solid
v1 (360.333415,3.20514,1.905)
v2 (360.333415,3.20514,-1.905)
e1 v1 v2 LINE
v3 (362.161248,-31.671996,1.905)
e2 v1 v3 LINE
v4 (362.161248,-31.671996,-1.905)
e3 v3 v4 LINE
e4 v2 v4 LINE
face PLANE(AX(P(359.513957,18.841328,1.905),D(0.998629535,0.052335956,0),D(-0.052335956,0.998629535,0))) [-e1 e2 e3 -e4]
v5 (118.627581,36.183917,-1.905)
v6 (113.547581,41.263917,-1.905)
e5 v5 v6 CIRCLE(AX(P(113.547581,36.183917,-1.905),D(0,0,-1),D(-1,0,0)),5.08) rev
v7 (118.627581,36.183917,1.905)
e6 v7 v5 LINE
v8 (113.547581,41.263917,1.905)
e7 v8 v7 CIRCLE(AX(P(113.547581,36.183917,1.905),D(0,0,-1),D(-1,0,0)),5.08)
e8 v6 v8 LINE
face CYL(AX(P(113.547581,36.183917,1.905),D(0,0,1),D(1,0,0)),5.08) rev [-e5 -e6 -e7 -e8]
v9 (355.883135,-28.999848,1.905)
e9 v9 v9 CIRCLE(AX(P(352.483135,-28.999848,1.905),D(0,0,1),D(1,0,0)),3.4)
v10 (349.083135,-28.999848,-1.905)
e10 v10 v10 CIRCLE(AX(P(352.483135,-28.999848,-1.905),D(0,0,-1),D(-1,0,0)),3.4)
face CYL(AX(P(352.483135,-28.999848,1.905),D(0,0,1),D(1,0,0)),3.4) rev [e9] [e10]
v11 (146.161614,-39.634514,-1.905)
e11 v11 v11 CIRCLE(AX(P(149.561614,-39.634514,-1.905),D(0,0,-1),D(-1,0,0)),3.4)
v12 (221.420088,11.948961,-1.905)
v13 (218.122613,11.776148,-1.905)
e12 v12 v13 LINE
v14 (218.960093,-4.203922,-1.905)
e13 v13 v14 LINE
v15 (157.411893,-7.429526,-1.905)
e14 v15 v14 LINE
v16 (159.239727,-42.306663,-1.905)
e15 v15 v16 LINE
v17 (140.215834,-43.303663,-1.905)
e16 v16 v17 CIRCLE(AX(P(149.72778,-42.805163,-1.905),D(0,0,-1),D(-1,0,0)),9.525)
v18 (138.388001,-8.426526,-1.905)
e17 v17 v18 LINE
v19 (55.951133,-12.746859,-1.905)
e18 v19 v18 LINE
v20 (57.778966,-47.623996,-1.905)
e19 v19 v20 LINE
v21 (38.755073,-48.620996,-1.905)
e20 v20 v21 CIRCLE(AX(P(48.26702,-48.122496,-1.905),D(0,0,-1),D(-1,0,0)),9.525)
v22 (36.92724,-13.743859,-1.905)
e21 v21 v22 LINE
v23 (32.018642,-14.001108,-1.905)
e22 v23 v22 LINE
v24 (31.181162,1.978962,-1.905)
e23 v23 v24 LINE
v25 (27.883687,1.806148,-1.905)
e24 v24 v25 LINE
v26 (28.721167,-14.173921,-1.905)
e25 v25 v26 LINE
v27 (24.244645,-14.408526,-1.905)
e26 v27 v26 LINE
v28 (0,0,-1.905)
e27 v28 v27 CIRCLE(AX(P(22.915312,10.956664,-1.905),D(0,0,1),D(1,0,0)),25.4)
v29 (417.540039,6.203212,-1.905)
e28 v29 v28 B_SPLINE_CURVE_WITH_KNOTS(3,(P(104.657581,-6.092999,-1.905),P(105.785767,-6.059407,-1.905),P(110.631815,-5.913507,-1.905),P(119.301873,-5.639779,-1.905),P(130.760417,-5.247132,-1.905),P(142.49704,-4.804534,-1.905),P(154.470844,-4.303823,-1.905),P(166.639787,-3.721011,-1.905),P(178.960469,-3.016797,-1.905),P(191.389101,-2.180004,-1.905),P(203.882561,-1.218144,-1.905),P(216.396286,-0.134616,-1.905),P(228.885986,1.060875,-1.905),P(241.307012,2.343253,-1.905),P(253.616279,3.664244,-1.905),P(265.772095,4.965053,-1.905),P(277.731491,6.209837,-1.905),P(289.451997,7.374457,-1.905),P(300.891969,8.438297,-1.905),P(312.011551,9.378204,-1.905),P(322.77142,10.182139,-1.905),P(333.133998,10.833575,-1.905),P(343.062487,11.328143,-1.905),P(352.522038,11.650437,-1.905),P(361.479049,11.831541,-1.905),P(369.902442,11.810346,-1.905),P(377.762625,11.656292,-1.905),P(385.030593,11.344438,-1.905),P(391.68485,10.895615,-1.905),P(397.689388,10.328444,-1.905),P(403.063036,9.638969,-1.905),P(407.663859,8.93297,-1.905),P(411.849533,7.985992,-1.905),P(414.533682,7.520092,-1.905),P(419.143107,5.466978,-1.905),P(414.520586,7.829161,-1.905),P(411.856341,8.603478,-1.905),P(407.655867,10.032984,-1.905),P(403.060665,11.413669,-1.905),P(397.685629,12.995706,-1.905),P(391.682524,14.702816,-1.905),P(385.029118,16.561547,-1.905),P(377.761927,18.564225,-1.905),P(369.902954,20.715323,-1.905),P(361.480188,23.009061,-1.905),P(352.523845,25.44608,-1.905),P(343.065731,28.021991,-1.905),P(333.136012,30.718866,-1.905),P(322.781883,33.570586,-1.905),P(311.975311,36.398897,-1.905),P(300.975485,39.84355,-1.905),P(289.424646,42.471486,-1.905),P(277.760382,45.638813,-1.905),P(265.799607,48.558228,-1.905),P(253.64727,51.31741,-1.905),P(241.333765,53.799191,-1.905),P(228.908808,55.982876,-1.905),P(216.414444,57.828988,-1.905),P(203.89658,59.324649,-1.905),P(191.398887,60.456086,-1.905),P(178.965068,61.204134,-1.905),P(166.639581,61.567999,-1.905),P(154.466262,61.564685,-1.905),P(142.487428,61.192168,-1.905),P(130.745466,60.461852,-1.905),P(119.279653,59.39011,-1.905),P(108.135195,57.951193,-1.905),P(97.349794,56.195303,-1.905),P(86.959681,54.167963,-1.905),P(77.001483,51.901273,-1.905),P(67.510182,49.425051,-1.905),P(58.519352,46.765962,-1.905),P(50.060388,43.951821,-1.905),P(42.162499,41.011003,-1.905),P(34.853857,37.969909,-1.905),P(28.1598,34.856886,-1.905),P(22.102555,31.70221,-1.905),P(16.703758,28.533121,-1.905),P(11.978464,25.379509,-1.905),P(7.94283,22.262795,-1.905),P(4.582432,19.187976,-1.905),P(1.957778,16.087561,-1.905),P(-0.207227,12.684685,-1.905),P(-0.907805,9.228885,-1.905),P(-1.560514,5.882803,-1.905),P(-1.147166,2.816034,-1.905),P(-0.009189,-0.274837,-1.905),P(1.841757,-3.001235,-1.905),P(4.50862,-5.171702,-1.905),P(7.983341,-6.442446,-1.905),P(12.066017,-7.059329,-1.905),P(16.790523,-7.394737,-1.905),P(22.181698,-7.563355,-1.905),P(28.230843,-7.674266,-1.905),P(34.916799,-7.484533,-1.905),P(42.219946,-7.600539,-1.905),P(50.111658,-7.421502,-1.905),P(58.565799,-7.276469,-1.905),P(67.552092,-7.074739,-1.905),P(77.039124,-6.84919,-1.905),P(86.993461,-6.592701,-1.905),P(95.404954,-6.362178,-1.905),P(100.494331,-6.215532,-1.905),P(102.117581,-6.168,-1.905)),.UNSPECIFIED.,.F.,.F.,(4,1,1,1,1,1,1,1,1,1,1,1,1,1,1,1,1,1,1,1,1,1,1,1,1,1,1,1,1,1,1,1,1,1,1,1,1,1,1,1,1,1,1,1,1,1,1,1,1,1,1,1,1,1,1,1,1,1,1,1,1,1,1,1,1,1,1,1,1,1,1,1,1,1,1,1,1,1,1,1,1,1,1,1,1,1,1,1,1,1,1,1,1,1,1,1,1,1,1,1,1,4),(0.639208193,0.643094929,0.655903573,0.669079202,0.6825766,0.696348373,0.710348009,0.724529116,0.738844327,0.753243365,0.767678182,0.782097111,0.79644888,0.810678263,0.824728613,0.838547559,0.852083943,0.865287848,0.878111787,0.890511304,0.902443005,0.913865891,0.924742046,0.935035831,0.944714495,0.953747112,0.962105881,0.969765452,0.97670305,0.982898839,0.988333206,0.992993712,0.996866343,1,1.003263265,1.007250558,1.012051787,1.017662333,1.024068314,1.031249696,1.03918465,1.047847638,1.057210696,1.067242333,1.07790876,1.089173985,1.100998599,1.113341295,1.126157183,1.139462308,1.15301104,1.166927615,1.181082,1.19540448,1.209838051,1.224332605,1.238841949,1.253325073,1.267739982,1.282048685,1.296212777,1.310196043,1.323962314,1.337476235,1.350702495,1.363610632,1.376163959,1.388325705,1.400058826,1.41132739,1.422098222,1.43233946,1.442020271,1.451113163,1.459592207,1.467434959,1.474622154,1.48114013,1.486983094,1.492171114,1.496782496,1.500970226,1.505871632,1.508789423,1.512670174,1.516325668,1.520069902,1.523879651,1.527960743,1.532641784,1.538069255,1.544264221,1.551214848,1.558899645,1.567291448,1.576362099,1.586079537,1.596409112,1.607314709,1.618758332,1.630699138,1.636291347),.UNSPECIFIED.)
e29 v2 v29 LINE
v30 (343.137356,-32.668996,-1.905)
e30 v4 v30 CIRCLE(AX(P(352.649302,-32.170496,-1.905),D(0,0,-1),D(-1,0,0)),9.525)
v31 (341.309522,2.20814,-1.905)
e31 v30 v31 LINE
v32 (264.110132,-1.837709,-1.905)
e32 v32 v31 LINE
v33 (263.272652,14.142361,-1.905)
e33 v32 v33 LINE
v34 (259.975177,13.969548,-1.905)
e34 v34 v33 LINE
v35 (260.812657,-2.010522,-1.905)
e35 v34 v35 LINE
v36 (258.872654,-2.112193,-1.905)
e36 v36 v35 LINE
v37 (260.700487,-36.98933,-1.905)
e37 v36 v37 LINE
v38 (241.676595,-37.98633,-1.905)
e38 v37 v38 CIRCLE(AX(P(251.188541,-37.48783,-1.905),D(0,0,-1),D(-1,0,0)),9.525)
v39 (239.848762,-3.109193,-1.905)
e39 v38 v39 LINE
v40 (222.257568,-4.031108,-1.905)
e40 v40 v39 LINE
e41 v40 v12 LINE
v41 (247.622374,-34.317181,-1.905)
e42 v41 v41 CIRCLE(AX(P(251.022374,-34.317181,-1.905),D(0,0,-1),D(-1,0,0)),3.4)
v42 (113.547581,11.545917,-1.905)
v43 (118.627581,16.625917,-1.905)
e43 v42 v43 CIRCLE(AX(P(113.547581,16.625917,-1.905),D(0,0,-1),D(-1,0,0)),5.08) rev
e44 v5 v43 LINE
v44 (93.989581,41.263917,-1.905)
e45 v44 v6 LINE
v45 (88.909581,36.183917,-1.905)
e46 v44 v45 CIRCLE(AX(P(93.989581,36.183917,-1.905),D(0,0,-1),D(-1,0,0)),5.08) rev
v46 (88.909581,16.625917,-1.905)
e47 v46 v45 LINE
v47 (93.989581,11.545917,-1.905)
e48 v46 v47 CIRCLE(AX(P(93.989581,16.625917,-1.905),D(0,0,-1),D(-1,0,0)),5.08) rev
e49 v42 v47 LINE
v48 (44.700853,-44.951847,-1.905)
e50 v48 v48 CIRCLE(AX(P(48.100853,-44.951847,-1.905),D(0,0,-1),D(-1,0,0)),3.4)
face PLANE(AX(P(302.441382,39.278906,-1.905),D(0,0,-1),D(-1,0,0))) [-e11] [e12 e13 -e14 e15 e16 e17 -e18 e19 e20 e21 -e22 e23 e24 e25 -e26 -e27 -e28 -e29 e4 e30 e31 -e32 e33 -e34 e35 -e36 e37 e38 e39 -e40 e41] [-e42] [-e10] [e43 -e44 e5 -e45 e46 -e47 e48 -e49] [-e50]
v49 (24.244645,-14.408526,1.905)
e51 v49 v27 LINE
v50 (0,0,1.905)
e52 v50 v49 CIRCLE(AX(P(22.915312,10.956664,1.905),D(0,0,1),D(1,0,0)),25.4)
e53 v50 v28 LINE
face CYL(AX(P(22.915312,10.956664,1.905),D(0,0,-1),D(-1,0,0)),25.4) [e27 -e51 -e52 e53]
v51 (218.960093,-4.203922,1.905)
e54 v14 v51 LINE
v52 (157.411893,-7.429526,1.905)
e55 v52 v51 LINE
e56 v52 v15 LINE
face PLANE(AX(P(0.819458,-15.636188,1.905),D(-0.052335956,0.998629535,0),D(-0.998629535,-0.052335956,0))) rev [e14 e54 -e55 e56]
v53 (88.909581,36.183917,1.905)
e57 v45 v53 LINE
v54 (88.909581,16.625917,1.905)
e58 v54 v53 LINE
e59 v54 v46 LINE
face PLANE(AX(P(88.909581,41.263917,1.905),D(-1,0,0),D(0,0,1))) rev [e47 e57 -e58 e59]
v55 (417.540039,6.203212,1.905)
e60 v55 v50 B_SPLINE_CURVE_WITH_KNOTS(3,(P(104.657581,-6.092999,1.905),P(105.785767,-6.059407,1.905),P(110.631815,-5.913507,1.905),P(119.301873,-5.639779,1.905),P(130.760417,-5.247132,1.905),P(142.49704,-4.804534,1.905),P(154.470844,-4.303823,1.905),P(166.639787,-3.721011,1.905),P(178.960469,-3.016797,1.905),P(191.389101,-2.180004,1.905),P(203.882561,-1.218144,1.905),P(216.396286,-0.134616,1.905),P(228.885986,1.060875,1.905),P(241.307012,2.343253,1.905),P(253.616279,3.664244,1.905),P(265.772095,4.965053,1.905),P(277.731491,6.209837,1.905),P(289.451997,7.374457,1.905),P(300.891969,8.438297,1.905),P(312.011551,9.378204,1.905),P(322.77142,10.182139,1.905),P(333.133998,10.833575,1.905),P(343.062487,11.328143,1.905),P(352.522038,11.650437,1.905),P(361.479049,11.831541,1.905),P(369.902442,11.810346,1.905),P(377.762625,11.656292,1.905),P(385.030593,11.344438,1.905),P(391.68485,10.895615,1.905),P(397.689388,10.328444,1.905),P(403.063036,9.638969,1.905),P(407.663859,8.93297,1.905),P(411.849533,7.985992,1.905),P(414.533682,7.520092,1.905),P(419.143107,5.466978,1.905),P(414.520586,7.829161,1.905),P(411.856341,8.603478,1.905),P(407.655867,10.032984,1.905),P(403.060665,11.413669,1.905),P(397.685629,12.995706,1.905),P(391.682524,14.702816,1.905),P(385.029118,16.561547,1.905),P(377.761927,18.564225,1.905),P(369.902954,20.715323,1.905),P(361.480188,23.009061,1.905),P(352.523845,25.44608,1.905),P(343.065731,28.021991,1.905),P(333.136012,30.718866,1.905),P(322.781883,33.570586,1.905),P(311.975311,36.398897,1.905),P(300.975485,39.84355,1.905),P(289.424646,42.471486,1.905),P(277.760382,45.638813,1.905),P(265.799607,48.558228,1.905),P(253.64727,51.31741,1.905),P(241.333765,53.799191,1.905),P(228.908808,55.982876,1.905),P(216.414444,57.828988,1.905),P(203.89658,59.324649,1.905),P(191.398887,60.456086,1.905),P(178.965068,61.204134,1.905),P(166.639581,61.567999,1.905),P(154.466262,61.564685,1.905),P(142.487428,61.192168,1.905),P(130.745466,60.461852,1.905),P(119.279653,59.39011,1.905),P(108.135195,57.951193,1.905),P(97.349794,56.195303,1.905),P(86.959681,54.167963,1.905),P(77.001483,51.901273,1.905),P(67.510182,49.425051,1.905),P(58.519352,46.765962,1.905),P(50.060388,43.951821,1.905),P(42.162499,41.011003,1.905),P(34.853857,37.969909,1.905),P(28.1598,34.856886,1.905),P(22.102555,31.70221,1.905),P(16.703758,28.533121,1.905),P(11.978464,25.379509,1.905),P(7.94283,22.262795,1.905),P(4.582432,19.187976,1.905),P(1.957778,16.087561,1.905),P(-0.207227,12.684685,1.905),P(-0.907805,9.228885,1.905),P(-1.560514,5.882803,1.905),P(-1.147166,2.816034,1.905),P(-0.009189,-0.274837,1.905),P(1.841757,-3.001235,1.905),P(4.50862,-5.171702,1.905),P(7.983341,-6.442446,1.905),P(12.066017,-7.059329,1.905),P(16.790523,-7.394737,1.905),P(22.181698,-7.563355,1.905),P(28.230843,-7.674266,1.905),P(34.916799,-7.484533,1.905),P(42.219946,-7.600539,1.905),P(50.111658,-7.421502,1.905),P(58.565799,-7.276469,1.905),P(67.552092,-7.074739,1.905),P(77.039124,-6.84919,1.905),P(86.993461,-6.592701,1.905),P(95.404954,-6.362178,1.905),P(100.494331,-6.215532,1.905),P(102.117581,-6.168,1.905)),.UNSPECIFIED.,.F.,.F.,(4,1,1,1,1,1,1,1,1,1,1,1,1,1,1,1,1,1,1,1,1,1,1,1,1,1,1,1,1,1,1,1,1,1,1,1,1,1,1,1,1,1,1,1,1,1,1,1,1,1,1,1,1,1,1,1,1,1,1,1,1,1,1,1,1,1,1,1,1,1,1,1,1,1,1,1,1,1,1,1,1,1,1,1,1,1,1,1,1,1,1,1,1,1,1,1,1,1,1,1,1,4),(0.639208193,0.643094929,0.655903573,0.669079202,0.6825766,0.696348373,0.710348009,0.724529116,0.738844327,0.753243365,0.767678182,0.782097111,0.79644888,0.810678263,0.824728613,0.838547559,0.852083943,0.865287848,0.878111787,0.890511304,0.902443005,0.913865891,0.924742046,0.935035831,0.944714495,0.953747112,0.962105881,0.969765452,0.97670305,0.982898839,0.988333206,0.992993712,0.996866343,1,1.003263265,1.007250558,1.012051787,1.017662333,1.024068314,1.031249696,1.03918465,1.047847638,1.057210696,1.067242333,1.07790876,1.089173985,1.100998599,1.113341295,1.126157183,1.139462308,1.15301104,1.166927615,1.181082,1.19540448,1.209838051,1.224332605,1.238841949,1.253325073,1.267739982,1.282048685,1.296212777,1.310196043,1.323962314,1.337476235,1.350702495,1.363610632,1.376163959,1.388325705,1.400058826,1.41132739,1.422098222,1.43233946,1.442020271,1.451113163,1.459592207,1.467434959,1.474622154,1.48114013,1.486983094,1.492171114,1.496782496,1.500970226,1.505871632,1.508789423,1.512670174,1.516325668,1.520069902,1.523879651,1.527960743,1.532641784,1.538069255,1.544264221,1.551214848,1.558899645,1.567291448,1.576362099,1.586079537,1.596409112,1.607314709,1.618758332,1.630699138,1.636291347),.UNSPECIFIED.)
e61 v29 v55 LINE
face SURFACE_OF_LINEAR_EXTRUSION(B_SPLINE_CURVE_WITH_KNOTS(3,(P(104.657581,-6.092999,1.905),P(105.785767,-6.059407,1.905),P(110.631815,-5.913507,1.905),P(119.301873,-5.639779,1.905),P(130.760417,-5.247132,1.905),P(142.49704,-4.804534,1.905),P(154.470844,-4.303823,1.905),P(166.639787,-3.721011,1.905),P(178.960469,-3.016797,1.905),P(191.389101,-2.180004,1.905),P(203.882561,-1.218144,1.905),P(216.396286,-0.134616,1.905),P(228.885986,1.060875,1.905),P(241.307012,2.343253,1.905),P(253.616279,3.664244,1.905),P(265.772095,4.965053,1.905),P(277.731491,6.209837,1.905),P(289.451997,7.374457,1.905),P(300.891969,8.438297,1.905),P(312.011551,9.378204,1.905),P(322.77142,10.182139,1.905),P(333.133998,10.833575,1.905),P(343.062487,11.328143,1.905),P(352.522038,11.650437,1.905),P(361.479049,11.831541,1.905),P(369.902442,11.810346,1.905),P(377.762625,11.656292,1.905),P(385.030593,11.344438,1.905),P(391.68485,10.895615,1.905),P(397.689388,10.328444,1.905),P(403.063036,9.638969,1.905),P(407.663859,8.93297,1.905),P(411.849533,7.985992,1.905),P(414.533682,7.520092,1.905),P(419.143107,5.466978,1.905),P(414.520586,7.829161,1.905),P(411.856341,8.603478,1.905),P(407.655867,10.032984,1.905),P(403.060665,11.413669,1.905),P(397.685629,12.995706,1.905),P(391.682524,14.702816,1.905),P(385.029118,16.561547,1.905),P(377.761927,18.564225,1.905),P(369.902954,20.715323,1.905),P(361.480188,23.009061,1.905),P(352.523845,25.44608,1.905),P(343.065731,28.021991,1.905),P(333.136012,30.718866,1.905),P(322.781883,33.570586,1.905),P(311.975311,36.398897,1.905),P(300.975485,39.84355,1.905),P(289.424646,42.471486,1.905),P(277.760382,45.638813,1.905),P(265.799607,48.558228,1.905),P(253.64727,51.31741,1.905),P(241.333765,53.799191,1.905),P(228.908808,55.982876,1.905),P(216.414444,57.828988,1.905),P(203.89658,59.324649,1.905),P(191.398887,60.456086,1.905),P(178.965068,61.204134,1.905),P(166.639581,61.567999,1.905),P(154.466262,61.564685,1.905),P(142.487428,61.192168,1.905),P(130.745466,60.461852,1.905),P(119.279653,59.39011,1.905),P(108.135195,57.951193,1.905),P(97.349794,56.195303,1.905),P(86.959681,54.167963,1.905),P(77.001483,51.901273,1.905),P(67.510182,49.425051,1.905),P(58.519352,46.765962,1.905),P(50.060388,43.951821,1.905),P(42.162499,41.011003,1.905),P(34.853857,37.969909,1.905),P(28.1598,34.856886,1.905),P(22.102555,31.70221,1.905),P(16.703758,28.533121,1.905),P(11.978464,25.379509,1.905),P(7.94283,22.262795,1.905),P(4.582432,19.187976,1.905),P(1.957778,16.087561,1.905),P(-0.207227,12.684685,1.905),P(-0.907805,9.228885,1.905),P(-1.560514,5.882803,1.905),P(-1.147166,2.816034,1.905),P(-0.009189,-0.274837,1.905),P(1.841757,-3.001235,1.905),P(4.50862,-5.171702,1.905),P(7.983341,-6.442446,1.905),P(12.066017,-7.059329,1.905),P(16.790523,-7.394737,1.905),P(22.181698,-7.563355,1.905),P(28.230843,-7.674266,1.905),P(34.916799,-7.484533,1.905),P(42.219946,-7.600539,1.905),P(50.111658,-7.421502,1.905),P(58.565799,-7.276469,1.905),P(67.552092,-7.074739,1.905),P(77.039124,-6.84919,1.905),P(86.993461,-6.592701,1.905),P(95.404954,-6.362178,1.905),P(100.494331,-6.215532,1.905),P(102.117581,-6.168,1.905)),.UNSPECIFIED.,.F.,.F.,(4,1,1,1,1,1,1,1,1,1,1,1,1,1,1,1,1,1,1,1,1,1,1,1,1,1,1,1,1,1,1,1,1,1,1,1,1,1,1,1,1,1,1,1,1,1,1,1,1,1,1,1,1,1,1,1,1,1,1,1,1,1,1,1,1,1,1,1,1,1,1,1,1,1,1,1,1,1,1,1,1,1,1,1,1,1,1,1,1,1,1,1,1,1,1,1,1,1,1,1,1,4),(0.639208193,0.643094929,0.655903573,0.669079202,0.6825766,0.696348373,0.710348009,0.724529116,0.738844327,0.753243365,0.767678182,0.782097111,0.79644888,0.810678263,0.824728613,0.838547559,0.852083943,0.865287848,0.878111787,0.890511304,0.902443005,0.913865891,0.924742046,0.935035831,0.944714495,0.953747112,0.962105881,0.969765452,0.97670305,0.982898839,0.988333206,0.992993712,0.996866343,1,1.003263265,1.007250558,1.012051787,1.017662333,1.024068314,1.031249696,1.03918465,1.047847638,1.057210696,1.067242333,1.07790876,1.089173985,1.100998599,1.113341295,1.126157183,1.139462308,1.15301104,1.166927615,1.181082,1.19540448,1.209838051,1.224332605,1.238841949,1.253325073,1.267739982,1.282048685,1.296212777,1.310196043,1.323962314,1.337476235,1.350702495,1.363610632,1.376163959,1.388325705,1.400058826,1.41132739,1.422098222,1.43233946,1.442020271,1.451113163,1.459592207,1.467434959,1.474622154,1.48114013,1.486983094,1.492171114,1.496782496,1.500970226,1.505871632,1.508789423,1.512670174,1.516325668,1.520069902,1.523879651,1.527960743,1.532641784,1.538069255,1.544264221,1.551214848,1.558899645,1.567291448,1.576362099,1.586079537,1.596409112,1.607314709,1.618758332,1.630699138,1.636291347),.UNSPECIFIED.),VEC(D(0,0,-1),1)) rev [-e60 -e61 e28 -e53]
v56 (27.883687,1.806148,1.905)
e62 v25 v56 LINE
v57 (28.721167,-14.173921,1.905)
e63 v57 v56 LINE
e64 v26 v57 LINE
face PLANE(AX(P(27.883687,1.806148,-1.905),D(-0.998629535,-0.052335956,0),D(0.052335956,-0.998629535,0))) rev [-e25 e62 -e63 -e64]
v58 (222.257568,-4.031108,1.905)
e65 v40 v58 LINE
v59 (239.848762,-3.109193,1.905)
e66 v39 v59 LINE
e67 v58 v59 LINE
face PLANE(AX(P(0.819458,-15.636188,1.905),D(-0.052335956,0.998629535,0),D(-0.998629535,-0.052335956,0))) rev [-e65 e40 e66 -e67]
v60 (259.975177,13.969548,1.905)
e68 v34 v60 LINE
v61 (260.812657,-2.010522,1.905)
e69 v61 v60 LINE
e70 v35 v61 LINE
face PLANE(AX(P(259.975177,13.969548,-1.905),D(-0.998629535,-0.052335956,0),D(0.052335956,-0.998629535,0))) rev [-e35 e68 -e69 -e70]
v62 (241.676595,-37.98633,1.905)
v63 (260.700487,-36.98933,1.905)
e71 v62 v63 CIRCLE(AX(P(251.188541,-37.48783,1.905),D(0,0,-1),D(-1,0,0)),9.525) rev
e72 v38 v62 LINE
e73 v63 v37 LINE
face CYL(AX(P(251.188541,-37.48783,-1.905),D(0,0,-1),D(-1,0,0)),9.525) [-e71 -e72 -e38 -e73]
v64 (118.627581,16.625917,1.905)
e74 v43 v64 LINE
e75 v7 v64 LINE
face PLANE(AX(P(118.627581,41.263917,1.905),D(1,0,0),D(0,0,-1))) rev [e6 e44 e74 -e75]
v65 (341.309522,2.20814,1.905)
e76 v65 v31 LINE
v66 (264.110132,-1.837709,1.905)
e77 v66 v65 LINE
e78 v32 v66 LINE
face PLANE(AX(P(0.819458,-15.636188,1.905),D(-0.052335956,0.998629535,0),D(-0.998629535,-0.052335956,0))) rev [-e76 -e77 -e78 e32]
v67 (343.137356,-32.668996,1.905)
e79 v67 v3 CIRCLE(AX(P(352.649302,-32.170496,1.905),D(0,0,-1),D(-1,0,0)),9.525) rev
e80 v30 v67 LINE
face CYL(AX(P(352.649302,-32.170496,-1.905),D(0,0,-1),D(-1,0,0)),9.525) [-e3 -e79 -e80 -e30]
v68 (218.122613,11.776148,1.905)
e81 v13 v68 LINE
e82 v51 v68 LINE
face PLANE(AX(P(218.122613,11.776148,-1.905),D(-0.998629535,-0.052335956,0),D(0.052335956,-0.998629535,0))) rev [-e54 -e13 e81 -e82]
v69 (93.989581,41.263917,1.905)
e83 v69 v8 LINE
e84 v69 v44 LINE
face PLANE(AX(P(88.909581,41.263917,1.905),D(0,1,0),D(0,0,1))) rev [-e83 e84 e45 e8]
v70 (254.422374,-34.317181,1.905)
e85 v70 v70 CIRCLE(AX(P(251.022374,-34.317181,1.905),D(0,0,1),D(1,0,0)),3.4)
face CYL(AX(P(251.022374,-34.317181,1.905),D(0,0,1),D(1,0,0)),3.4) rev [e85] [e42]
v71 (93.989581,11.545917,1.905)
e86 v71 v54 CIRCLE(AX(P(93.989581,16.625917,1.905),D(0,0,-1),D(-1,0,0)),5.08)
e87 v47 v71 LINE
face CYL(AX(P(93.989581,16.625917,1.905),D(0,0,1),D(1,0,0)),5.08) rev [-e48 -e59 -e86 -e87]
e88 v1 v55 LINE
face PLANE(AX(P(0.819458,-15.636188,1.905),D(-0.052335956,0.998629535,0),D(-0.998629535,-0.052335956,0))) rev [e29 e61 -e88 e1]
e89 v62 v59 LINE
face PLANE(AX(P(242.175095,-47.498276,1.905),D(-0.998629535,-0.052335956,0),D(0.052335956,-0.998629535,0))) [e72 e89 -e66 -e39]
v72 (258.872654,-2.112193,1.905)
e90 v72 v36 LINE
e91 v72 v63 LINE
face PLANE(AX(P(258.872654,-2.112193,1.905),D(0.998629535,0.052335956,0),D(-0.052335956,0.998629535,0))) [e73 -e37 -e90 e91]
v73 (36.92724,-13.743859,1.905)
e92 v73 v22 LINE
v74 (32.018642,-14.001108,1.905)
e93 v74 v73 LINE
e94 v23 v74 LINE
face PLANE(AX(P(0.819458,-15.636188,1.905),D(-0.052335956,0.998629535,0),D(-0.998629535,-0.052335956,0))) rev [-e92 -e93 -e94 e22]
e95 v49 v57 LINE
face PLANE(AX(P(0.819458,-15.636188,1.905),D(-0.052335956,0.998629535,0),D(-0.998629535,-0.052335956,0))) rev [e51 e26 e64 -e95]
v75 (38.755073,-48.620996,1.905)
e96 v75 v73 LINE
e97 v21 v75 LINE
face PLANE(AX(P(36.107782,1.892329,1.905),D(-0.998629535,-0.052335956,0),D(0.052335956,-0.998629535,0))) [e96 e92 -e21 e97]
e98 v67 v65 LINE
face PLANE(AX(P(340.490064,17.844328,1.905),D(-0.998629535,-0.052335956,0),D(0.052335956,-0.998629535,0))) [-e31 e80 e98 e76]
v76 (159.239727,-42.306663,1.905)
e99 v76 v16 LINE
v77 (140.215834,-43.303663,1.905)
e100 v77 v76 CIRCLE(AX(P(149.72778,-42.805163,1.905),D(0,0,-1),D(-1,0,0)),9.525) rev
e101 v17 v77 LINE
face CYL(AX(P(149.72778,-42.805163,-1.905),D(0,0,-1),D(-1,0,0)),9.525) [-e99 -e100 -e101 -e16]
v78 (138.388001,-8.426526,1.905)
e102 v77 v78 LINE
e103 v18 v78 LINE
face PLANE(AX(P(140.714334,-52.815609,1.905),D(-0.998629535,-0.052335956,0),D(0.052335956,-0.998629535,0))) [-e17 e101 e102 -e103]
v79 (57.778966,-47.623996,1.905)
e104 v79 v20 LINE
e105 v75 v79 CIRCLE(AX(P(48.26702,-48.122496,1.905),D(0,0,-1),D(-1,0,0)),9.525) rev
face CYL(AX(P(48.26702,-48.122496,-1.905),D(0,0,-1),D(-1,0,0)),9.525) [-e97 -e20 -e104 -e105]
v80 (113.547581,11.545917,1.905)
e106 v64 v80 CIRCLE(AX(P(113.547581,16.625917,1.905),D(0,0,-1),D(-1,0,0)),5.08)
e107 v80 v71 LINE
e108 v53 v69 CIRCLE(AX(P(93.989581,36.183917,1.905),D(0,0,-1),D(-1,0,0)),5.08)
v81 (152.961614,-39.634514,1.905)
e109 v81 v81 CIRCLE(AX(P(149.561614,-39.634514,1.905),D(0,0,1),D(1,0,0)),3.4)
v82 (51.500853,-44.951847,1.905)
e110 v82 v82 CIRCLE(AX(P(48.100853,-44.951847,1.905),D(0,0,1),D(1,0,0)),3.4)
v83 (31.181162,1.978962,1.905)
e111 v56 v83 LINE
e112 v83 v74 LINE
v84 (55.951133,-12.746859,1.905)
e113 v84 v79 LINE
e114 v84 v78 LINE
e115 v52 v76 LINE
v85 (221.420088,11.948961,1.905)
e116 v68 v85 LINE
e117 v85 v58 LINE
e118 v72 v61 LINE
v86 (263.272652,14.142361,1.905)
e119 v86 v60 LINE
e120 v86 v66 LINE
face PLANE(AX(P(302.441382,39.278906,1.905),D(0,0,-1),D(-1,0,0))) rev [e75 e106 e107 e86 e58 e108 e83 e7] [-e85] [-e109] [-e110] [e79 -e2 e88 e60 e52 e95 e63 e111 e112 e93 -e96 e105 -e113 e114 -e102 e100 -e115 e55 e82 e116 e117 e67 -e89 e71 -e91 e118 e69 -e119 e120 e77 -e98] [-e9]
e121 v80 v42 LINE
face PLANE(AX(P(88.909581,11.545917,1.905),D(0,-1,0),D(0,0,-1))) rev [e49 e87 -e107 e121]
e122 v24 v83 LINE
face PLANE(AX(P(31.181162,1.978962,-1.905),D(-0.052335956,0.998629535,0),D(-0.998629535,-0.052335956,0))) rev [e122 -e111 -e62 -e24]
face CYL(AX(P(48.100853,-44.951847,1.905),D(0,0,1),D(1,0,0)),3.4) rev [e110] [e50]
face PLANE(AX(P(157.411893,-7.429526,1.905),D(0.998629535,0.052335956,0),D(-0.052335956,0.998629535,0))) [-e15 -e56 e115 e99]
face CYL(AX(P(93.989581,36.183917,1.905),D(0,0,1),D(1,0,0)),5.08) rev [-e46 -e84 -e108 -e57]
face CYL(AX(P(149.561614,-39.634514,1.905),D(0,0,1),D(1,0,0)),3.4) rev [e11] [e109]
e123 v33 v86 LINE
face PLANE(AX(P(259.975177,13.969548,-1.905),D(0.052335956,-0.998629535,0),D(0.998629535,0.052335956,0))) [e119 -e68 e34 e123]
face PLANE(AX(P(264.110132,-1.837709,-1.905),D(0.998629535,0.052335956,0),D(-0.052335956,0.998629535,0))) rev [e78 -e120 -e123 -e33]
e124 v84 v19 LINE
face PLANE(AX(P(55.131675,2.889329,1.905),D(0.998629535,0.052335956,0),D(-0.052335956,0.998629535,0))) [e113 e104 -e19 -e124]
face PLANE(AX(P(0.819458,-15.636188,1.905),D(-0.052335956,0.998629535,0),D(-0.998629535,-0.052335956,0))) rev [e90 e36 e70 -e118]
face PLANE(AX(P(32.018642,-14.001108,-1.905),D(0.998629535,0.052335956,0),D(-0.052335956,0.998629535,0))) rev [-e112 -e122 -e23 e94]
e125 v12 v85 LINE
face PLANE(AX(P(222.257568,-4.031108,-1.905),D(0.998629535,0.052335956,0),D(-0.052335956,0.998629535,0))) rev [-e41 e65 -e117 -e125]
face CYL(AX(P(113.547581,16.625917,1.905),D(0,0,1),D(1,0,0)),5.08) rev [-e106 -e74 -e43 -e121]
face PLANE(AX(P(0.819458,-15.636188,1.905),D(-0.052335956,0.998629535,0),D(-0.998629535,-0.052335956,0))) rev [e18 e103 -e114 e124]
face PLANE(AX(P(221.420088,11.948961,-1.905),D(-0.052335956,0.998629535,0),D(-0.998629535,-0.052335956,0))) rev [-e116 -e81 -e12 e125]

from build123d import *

# Parameters (mm, degrees)
BOSS_EXTRUDE1_DEPTH     = 1.905
BOSS_EXTRUDE2_START     = -1.905
BOSS_EXTRUDE2_DEPTH     = 3.81
TAP_DRILL_FOR_M8_TAP1_D = 6.8
FILLET1_R               = 5.08
CUT_EXTRUDE1_DEPTH      = 423.240896091
CUT_EXTRUDE1_DEPTH_BACK = 423.240896091
FILLET3_RADIUS          = 9.525
FILLET3_LENGTH          = 3.81
FILLET4_RADIUS          = 9.525
FILLET4_LENGTH          = 3.81
FILLET5_RADIUS          = 9.525
FILLET5_LENGTH          = 3.81
FILLET6_RADIUS          = 9.525
FILLET6_LENGTH          = 3.81


# Read off the part's stored shape, not the designer's step: Boss-Extrude2
with BuildPart() as part:
    # Sketch1 → Boss-Extrude1 (new, symmetric)
    with BuildSketch(Plane.XY):
        with BuildLine():
            Line((88.909580783, 41.26391721), (118.627580783, 41.26391721))
            Line((118.627580783, 41.26391721), (118.627580783, 11.54591721))
            Line((118.627580783, 11.54591721), (104.657580783, 11.54591721))
            Line((104.657580783, 11.54591721), (104.657580783, -6.092999308))
            add(Edge.make_bspline(
                [(104.657580783, -6.092999308), (105.78576696, -6.059407355), (110.631815253, -5.913506799), (119.301873398, -5.639779221), (130.760417354, -5.247131629), (142.497040297, -4.804534274), (154.470843852, -4.303823254), (166.639786874, -3.721010638), (178.960468691, -3.016797235), (191.389100737, -2.180004159), (203.882560612, -1.218144366), (216.39628583, -0.134616133), (228.885986304, 1.060875443), (241.307012185, 2.343253014), (253.616279039, 3.664244089), (265.772095128, 4.965053183), (277.731490713, 6.209836508), (289.45199663, 7.374456804), (300.891969345, 8.438297263), (312.011551274, 9.378204355), (322.771419978, 10.182138596), (333.133998236, 10.833574931), (343.062487119, 11.328143195), (352.522037602, 11.650436807), (361.47904928, 11.831540776), (369.902441551, 11.810346197), (377.762625202, 11.656292062), (385.030592513, 11.344437654), (391.68484956, 10.895614899), (397.689387538, 10.328444191), (403.063035719, 9.638969084), (407.663858949, 8.932969554), (411.84953295, 7.985992463), (414.53368223, 7.52009233), (419.143107129, 5.466978357), (414.520586066, 7.829160816), (411.856340794, 8.603478482), (407.655866836, 10.032984433), (403.060664813, 11.413668567), (397.685628885, 12.995705784), (391.682523818, 14.702815518), (385.029118067, 16.561547034), (377.76192652, 18.564224708), (369.902953821, 20.715322997), (361.480188002, 23.009061308), (352.523844819, 25.446080399), (343.06573052, 28.021990963), (333.136012333, 30.718866033), (322.7818834, 33.570585543), (311.975311356, 36.398897394), (300.975484828, 39.84355007), (289.42464591, 42.471486304), (277.760382476, 45.638812888), (265.799607232, 48.558228126), (253.647270041, 51.317410307), (241.333764909, 53.799191005), (228.908808416, 55.982875957), (216.414443808, 57.828987679), (203.896579889, 59.324649469), (191.398887145, 60.45608609), (178.965067687, 61.204134062), (166.639581281, 61.567998585), (154.466261788, 61.564684681), (142.487428182, 61.192168146), (130.745466135, 60.461851913), (119.27965342, 59.390109524), (108.135195394, 57.951193311), (97.349793586, 56.195302776), (86.959680907, 54.167962822), (77.001482933, 51.901273201), (67.510182352, 49.425050582), (58.519352194, 46.765961709), (50.060387838, 43.951821062), (42.162499305, 41.011003286), (34.853856572, 37.969908862), (28.15980047, 34.856885781), (22.102555486, 31.702210335), (16.703758276, 28.533121102), (11.978464499, 25.379509483), (7.942830392, 22.262794683), (4.5824322, 19.18797639), (1.957778069, 16.087560883), (-0.207226816, 12.684684668), (-0.907805064, 9.228884918), (-1.560514008, 5.882802979), (-1.147165708, 2.816033578), (-0.009188676, -0.274836968), (1.841756771, -3.001235322), (4.508620223, -5.171701763), (7.983340931, -6.442446365), (12.066016603, -7.059329176), (16.790523111, -7.394736703), (22.181697881, -7.563354981), (28.230842797, -7.674266105), (34.916798872, -7.484533075), (42.21994635, -7.600539498), (50.111658487, -7.421501694), (58.565799156, -7.276468805), (67.552092336, -7.074739405), (77.0391238, -6.84918955), (86.993460829, -6.592701098), (95.404954455, -6.362178203), (100.494330717, -6.215531943), (102.117580783, -6.167999853)],
                knots=[0.639208193, 0.639208193, 0.639208193, 0.639208193, 0.643094929, 0.655903573, 0.669079202, 0.6825766, 0.696348373, 0.710348009, 0.724529116, 0.738844327, 0.753243365, 0.767678182, 0.782097111, 0.79644888, 0.810678263, 0.824728613, 0.838547559, 0.852083943, 0.865287848, 0.878111787, 0.890511304, 0.902443005, 0.913865891, 0.924742046, 0.935035831, 0.944714495, 0.953747112, 0.962105881, 0.969765452, 0.97670305, 0.982898839, 0.988333206, 0.992993712, 0.996866343, 1, 1.003263265, 1.007250558, 1.012051787, 1.017662333, 1.024068314, 1.031249696, 1.03918465, 1.047847638, 1.057210696, 1.067242333, 1.07790876, 1.089173985, 1.100998599, 1.113341295, 1.126157183, 1.139462308, 1.15301104, 1.166927615, 1.181082, 1.19540448, 1.209838051, 1.224332605, 1.238841949, 1.253325073, 1.267739982, 1.282048685, 1.296212777, 1.310196043, 1.323962314, 1.337476235, 1.350702495, 1.363610632, 1.376163959, 1.388325705, 1.400058826, 1.41132739, 1.422098222, 1.43233946, 1.442020271, 1.451113163, 1.459592207, 1.467434959, 1.474622154, 1.48114013, 1.486983094, 1.492171114, 1.496782496, 1.500970226, 1.505871632, 1.508789423, 1.512670174, 1.516325668, 1.520069902, 1.523879651, 1.527960743, 1.532641784, 1.538069255, 1.544264221, 1.551214848, 1.558899645, 1.567291448, 1.576362099, 1.586079537, 1.596409112, 1.607314709, 1.618758332, 1.630699138, 1.636291347, 1.636291347, 1.636291347, 1.636291347], degree=3))
            Line((102.117580783, -6.167999853), (102.117580783, 11.54591721))
            Line((102.117580783, 11.54591721), (88.909580783, 11.54591721))
            Line((88.909580783, 11.54591721), (88.909580783, 41.26391721))
        make_face()
    extrude(amount=BOSS_EXTRUDE1_DEPTH, both=True)

    # Boss-Extrude2 outline → Boss-Extrude2 (add)
    with BuildSketch(Plane.XY.offset(BOSS_EXTRUDE2_START)):
        with BuildLine():
            Line((104.657580783, 11.54591721), (102.117580783, 11.54591721))
            Line((102.117580783, 11.54591721), (102.117580783, -6.167999853))
            add(Edge.make_bspline(
                [(0, 0), (0.032082235, -0.06523567), (0.553122873, -1.103108425), (1.841756771, -3.001235322), (4.508620223, -5.171701763), (7.983340931, -6.442446365), (12.066016603, -7.059329176), (16.790523111, -7.394736703), (22.181697881, -7.563354981), (28.230842797, -7.674266105), (34.916798872, -7.484533075), (42.21994635, -7.600539498), (50.111658487, -7.421501694), (58.565799156, -7.276468805), (67.552092336, -7.074739405), (77.0391238, -6.84918955), (86.993460829, -6.592701098), (95.404954455, -6.362178203), (100.494330717, -6.215531943), (102.117580783, -6.167999853)],
                knots=[1.516075579, 1.516075579, 1.516075579, 1.516075579, 1.516325668, 1.520069902, 1.523879651, 1.527960743, 1.532641784, 1.538069255, 1.544264221, 1.551214848, 1.558899645, 1.567291448, 1.576362099, 1.586079537, 1.596409112, 1.607314709, 1.618758332, 1.630699138, 1.636291347, 1.636291347, 1.636291347, 1.636291347], degree=3))
            ThreePointArc((0, 0), (9.93879362, -10.878398923), (24.244645014, -14.408526068))
            Line((24.244645014, -14.408526068), (36.927240105, -13.743859424))
            Line((36.927240105, -13.743859424), (39.25357336, -58.132942244))
            Line((39.25357336, -58.132942244), (58.277465998, -57.135942277))
            Line((58.277465998, -57.135942277), (55.951132743, -12.746859457))
            Line((55.951132743, -12.746859457), (138.388000837, -8.42652627))
            Line((138.388000837, -8.42652627), (140.714334092, -52.815609089))
            Line((140.714334092, -52.815609089), (159.738226729, -51.818609123))
            Line((159.738226729, -51.818609123), (157.411893474, -7.429526303))
            Line((157.411893474, -7.429526303), (239.848761568, -3.109193115))
            Line((239.848761568, -3.109193115), (242.175094823, -47.498275935))
            Line((242.175094823, -47.498275935), (261.19898746, -46.501275969))
            Line((261.19898746, -46.501275969), (258.872654205, -2.112193149))
            Line((258.872654205, -2.112193149), (341.309522299, 2.208140039))
            Line((341.309522299, 2.208140039), (343.635855554, -42.180942781))
            Line((343.635855554, -42.180942781), (362.659748191, -41.183942814))
            Line((362.659748191, -41.183942814), (360.333414936, 3.205140005))
            Line((360.333414936, 3.205140005), (417.54003932, 6.203212141))
            add(Edge.make_bspline(
                [(104.657580783, -6.092999308), (105.78576696, -6.059407355), (110.631815253, -5.913506799), (119.301873398, -5.639779221), (130.760417354, -5.247131629), (142.497040297, -4.804534274), (154.470843852, -4.303823254), (166.639786874, -3.721010638), (178.960468691, -3.016797235), (191.389100737, -2.180004159), (203.882560612, -1.218144366), (216.39628583, -0.134616133), (228.885986304, 1.060875443), (241.307012185, 2.343253014), (253.616279039, 3.664244089), (265.772095128, 4.965053183), (277.731490713, 6.209836508), (289.45199663, 7.374456804), (300.891969345, 8.438297263), (312.011551274, 9.378204355), (322.771419978, 10.182138596), (333.133998236, 10.833574931), (343.062487119, 11.328143195), (352.522037602, 11.650436807), (361.47904928, 11.831540776), (369.902441551, 11.810346197), (377.762625202, 11.656292062), (385.030592513, 11.344437654), (391.68484956, 10.895614899), (397.689387538, 10.328444191), (403.063035719, 9.638969084), (407.663858949, 8.932969554), (411.84953295, 7.985992463), (414.389124606, 7.545183862), (417.126697281, 6.361596446), (417.54003932, 6.203212141)],
                knots=[0.639208193, 0.639208193, 0.639208193, 0.639208193, 0.643094929, 0.655903573, 0.669079202, 0.6825766, 0.696348373, 0.710348009, 0.724529116, 0.738844327, 0.753243365, 0.767678182, 0.782097111, 0.79644888, 0.810678263, 0.824728613, 0.838547559, 0.852083943, 0.865287848, 0.878111787, 0.890511304, 0.902443005, 0.913865891, 0.924742046, 0.935035831, 0.944714495, 0.953747112, 0.962105881, 0.969765452, 0.97670305, 0.982898839, 0.988333206, 0.992993712, 0.996866343, 0.999371673, 0.999371673, 0.999371673, 0.999371673], degree=3))
            Line((104.657580783, -6.092999308), (104.657580783, 11.54591721))
        make_face()
    extrude(amount=BOSS_EXTRUDE2_DEPTH)

    # Tap Drill for M8 Tap1 (through all)
    with Locations(Plane.XY.offset(1.905)):
        with Locations((48.100853035, -44.951847169), (149.561613766, -39.634514015), (251.022374497, -34.31718086), (352.483135228, -28.999847706)):
            Hole(TAP_DRILL_FOR_M8_TAP1_D / 2)

    # Fillet1
    fillet1_edges = [part.edges().sort_by_distance(p)[0] for p in [
        (88.909580783, 11.54591721, 0),
        (118.627580783, 11.54591721, 0),
        (118.627580783, 41.26391721, 0),
        (88.909580783, 41.26391721, 0),
    ]]
    fillet(fillet1_edges, radius=FILLET1_R)

    # Sketch8 → Cut-Extrude1 (cut, two sides: drawn at the far end of the back side and taken through both)
    with BuildSketch(Plane.XY.offset(1.905).offset(-CUT_EXTRUDE1_DEPTH_BACK)):
        Polygon((32.01864182, -14.001108159), (31.181161848, 1.978961656), (27.883687124, 1.806148328), (28.721167096, -14.173921487), align=None)
        Polygon((222.257568191, -4.031108495), (221.420088219, 11.94896132), (218.122613495, 11.776147993), (218.960093467, -4.203921823), align=None)
        Polygon((264.110131992, -1.837708569), (263.27265202, 14.142361246), (259.975177297, 13.969547919), (260.812657268, -2.010521896), align=None)
    extrude(amount=CUT_EXTRUDE1_DEPTH + CUT_EXTRUDE1_DEPTH_BACK, mode=Mode.SUBTRACT)

    # Fillet3: full round fillet: the end face becomes a half cylinder, R = half its width
    fillet3_face = Plane((48.765519679, -57.634442261, 0), x_dir=(0, 0, -1), z_dir=(0.05233595627, -0.998629534753, 0))  # on the end face: x along it, z out of the body
    fillet3_slab = fillet3_face.offset(-FILLET3_RADIUS / 2) * Box(FILLET3_LENGTH, 2 * FILLET3_RADIUS, FILLET3_RADIUS, mode=Mode.PRIVATE)  # the body's end, R deep
    fillet3_round = Plane((48.267019696, -48.122495942, 0), x_dir=(0.05233595627, -0.998629534753, 0), z_dir=(0, 0, -1)) * Cylinder(FILLET3_RADIUS, FILLET3_LENGTH, mode=Mode.PRIVATE)  # its axis R under the face
    add(fillet3_slab - fillet3_round, mode=Mode.SUBTRACT)

    # Fillet4: full round fillet: the end face becomes a half cylinder, R = half its width
    fillet4_face = Plane((150.226280411, -52.317109106, 0), x_dir=(0, 0, 1), z_dir=(0.052335956221, -0.998629534756, 0))  # on the end face: x along it, z out of the body
    fillet4_slab = fillet4_face.offset(-FILLET4_RADIUS / 2) * Box(FILLET4_LENGTH, 2 * FILLET4_RADIUS, FILLET4_RADIUS, mode=Mode.PRIVATE)  # the body's end, R deep
    fillet4_round = Plane((149.727780428, -42.805162787, 0), x_dir=(0.052335956221, -0.998629534756, 0), z_dir=(0, 0, 1)) * Cylinder(FILLET4_RADIUS, FILLET4_LENGTH, mode=Mode.PRIVATE)  # its axis R under the face
    add(fillet4_slab - fillet4_round, mode=Mode.SUBTRACT)

    # Fillet5: full round fillet: the end face becomes a half cylinder, R = half its width
    fillet5_face = Plane((251.687041142, -46.999775952, 0), x_dir=(0, 0, 1), z_dir=(0.052335956221, -0.998629534756, 0))  # on the end face: x along it, z out of the body
    fillet5_slab = fillet5_face.offset(-FILLET5_RADIUS / 2) * Box(FILLET5_LENGTH, 2 * FILLET5_RADIUS, FILLET5_RADIUS, mode=Mode.PRIVATE)  # the body's end, R deep
    fillet5_round = Plane((251.188541159, -37.487829633, 0), x_dir=(0.052335956221, -0.998629534756, 0), z_dir=(0, 0, 1)) * Cylinder(FILLET5_RADIUS, FILLET5_LENGTH, mode=Mode.PRIVATE)  # its axis R under the face
    add(fillet5_slab - fillet5_round, mode=Mode.SUBTRACT)

    # Fillet6: full round fillet: the end face becomes a half cylinder, R = half its width
    fillet6_face = Plane((353.147801872, -41.682442798, 0), x_dir=(0, 0, -1), z_dir=(0.052335956273, -0.998629534753, 0))  # on the end face: x along it, z out of the body
    fillet6_slab = fillet6_face.offset(-FILLET6_RADIUS / 2) * Box(FILLET6_LENGTH, 2 * FILLET6_RADIUS, FILLET6_RADIUS, mode=Mode.PRIVATE)  # the body's end, R deep
    fillet6_round = Plane((352.649301888, -32.170496479, 0), x_dir=(0.052335956273, -0.998629534753, 0), z_dir=(0, 0, -1)) * Cylinder(FILLET6_RADIUS, FILLET6_LENGTH, mode=Mode.PRIVATE)  # its axis R under the face
    add(fillet6_slab - fillet6_round, mode=Mode.SUBTRACT)


solid = part.part
